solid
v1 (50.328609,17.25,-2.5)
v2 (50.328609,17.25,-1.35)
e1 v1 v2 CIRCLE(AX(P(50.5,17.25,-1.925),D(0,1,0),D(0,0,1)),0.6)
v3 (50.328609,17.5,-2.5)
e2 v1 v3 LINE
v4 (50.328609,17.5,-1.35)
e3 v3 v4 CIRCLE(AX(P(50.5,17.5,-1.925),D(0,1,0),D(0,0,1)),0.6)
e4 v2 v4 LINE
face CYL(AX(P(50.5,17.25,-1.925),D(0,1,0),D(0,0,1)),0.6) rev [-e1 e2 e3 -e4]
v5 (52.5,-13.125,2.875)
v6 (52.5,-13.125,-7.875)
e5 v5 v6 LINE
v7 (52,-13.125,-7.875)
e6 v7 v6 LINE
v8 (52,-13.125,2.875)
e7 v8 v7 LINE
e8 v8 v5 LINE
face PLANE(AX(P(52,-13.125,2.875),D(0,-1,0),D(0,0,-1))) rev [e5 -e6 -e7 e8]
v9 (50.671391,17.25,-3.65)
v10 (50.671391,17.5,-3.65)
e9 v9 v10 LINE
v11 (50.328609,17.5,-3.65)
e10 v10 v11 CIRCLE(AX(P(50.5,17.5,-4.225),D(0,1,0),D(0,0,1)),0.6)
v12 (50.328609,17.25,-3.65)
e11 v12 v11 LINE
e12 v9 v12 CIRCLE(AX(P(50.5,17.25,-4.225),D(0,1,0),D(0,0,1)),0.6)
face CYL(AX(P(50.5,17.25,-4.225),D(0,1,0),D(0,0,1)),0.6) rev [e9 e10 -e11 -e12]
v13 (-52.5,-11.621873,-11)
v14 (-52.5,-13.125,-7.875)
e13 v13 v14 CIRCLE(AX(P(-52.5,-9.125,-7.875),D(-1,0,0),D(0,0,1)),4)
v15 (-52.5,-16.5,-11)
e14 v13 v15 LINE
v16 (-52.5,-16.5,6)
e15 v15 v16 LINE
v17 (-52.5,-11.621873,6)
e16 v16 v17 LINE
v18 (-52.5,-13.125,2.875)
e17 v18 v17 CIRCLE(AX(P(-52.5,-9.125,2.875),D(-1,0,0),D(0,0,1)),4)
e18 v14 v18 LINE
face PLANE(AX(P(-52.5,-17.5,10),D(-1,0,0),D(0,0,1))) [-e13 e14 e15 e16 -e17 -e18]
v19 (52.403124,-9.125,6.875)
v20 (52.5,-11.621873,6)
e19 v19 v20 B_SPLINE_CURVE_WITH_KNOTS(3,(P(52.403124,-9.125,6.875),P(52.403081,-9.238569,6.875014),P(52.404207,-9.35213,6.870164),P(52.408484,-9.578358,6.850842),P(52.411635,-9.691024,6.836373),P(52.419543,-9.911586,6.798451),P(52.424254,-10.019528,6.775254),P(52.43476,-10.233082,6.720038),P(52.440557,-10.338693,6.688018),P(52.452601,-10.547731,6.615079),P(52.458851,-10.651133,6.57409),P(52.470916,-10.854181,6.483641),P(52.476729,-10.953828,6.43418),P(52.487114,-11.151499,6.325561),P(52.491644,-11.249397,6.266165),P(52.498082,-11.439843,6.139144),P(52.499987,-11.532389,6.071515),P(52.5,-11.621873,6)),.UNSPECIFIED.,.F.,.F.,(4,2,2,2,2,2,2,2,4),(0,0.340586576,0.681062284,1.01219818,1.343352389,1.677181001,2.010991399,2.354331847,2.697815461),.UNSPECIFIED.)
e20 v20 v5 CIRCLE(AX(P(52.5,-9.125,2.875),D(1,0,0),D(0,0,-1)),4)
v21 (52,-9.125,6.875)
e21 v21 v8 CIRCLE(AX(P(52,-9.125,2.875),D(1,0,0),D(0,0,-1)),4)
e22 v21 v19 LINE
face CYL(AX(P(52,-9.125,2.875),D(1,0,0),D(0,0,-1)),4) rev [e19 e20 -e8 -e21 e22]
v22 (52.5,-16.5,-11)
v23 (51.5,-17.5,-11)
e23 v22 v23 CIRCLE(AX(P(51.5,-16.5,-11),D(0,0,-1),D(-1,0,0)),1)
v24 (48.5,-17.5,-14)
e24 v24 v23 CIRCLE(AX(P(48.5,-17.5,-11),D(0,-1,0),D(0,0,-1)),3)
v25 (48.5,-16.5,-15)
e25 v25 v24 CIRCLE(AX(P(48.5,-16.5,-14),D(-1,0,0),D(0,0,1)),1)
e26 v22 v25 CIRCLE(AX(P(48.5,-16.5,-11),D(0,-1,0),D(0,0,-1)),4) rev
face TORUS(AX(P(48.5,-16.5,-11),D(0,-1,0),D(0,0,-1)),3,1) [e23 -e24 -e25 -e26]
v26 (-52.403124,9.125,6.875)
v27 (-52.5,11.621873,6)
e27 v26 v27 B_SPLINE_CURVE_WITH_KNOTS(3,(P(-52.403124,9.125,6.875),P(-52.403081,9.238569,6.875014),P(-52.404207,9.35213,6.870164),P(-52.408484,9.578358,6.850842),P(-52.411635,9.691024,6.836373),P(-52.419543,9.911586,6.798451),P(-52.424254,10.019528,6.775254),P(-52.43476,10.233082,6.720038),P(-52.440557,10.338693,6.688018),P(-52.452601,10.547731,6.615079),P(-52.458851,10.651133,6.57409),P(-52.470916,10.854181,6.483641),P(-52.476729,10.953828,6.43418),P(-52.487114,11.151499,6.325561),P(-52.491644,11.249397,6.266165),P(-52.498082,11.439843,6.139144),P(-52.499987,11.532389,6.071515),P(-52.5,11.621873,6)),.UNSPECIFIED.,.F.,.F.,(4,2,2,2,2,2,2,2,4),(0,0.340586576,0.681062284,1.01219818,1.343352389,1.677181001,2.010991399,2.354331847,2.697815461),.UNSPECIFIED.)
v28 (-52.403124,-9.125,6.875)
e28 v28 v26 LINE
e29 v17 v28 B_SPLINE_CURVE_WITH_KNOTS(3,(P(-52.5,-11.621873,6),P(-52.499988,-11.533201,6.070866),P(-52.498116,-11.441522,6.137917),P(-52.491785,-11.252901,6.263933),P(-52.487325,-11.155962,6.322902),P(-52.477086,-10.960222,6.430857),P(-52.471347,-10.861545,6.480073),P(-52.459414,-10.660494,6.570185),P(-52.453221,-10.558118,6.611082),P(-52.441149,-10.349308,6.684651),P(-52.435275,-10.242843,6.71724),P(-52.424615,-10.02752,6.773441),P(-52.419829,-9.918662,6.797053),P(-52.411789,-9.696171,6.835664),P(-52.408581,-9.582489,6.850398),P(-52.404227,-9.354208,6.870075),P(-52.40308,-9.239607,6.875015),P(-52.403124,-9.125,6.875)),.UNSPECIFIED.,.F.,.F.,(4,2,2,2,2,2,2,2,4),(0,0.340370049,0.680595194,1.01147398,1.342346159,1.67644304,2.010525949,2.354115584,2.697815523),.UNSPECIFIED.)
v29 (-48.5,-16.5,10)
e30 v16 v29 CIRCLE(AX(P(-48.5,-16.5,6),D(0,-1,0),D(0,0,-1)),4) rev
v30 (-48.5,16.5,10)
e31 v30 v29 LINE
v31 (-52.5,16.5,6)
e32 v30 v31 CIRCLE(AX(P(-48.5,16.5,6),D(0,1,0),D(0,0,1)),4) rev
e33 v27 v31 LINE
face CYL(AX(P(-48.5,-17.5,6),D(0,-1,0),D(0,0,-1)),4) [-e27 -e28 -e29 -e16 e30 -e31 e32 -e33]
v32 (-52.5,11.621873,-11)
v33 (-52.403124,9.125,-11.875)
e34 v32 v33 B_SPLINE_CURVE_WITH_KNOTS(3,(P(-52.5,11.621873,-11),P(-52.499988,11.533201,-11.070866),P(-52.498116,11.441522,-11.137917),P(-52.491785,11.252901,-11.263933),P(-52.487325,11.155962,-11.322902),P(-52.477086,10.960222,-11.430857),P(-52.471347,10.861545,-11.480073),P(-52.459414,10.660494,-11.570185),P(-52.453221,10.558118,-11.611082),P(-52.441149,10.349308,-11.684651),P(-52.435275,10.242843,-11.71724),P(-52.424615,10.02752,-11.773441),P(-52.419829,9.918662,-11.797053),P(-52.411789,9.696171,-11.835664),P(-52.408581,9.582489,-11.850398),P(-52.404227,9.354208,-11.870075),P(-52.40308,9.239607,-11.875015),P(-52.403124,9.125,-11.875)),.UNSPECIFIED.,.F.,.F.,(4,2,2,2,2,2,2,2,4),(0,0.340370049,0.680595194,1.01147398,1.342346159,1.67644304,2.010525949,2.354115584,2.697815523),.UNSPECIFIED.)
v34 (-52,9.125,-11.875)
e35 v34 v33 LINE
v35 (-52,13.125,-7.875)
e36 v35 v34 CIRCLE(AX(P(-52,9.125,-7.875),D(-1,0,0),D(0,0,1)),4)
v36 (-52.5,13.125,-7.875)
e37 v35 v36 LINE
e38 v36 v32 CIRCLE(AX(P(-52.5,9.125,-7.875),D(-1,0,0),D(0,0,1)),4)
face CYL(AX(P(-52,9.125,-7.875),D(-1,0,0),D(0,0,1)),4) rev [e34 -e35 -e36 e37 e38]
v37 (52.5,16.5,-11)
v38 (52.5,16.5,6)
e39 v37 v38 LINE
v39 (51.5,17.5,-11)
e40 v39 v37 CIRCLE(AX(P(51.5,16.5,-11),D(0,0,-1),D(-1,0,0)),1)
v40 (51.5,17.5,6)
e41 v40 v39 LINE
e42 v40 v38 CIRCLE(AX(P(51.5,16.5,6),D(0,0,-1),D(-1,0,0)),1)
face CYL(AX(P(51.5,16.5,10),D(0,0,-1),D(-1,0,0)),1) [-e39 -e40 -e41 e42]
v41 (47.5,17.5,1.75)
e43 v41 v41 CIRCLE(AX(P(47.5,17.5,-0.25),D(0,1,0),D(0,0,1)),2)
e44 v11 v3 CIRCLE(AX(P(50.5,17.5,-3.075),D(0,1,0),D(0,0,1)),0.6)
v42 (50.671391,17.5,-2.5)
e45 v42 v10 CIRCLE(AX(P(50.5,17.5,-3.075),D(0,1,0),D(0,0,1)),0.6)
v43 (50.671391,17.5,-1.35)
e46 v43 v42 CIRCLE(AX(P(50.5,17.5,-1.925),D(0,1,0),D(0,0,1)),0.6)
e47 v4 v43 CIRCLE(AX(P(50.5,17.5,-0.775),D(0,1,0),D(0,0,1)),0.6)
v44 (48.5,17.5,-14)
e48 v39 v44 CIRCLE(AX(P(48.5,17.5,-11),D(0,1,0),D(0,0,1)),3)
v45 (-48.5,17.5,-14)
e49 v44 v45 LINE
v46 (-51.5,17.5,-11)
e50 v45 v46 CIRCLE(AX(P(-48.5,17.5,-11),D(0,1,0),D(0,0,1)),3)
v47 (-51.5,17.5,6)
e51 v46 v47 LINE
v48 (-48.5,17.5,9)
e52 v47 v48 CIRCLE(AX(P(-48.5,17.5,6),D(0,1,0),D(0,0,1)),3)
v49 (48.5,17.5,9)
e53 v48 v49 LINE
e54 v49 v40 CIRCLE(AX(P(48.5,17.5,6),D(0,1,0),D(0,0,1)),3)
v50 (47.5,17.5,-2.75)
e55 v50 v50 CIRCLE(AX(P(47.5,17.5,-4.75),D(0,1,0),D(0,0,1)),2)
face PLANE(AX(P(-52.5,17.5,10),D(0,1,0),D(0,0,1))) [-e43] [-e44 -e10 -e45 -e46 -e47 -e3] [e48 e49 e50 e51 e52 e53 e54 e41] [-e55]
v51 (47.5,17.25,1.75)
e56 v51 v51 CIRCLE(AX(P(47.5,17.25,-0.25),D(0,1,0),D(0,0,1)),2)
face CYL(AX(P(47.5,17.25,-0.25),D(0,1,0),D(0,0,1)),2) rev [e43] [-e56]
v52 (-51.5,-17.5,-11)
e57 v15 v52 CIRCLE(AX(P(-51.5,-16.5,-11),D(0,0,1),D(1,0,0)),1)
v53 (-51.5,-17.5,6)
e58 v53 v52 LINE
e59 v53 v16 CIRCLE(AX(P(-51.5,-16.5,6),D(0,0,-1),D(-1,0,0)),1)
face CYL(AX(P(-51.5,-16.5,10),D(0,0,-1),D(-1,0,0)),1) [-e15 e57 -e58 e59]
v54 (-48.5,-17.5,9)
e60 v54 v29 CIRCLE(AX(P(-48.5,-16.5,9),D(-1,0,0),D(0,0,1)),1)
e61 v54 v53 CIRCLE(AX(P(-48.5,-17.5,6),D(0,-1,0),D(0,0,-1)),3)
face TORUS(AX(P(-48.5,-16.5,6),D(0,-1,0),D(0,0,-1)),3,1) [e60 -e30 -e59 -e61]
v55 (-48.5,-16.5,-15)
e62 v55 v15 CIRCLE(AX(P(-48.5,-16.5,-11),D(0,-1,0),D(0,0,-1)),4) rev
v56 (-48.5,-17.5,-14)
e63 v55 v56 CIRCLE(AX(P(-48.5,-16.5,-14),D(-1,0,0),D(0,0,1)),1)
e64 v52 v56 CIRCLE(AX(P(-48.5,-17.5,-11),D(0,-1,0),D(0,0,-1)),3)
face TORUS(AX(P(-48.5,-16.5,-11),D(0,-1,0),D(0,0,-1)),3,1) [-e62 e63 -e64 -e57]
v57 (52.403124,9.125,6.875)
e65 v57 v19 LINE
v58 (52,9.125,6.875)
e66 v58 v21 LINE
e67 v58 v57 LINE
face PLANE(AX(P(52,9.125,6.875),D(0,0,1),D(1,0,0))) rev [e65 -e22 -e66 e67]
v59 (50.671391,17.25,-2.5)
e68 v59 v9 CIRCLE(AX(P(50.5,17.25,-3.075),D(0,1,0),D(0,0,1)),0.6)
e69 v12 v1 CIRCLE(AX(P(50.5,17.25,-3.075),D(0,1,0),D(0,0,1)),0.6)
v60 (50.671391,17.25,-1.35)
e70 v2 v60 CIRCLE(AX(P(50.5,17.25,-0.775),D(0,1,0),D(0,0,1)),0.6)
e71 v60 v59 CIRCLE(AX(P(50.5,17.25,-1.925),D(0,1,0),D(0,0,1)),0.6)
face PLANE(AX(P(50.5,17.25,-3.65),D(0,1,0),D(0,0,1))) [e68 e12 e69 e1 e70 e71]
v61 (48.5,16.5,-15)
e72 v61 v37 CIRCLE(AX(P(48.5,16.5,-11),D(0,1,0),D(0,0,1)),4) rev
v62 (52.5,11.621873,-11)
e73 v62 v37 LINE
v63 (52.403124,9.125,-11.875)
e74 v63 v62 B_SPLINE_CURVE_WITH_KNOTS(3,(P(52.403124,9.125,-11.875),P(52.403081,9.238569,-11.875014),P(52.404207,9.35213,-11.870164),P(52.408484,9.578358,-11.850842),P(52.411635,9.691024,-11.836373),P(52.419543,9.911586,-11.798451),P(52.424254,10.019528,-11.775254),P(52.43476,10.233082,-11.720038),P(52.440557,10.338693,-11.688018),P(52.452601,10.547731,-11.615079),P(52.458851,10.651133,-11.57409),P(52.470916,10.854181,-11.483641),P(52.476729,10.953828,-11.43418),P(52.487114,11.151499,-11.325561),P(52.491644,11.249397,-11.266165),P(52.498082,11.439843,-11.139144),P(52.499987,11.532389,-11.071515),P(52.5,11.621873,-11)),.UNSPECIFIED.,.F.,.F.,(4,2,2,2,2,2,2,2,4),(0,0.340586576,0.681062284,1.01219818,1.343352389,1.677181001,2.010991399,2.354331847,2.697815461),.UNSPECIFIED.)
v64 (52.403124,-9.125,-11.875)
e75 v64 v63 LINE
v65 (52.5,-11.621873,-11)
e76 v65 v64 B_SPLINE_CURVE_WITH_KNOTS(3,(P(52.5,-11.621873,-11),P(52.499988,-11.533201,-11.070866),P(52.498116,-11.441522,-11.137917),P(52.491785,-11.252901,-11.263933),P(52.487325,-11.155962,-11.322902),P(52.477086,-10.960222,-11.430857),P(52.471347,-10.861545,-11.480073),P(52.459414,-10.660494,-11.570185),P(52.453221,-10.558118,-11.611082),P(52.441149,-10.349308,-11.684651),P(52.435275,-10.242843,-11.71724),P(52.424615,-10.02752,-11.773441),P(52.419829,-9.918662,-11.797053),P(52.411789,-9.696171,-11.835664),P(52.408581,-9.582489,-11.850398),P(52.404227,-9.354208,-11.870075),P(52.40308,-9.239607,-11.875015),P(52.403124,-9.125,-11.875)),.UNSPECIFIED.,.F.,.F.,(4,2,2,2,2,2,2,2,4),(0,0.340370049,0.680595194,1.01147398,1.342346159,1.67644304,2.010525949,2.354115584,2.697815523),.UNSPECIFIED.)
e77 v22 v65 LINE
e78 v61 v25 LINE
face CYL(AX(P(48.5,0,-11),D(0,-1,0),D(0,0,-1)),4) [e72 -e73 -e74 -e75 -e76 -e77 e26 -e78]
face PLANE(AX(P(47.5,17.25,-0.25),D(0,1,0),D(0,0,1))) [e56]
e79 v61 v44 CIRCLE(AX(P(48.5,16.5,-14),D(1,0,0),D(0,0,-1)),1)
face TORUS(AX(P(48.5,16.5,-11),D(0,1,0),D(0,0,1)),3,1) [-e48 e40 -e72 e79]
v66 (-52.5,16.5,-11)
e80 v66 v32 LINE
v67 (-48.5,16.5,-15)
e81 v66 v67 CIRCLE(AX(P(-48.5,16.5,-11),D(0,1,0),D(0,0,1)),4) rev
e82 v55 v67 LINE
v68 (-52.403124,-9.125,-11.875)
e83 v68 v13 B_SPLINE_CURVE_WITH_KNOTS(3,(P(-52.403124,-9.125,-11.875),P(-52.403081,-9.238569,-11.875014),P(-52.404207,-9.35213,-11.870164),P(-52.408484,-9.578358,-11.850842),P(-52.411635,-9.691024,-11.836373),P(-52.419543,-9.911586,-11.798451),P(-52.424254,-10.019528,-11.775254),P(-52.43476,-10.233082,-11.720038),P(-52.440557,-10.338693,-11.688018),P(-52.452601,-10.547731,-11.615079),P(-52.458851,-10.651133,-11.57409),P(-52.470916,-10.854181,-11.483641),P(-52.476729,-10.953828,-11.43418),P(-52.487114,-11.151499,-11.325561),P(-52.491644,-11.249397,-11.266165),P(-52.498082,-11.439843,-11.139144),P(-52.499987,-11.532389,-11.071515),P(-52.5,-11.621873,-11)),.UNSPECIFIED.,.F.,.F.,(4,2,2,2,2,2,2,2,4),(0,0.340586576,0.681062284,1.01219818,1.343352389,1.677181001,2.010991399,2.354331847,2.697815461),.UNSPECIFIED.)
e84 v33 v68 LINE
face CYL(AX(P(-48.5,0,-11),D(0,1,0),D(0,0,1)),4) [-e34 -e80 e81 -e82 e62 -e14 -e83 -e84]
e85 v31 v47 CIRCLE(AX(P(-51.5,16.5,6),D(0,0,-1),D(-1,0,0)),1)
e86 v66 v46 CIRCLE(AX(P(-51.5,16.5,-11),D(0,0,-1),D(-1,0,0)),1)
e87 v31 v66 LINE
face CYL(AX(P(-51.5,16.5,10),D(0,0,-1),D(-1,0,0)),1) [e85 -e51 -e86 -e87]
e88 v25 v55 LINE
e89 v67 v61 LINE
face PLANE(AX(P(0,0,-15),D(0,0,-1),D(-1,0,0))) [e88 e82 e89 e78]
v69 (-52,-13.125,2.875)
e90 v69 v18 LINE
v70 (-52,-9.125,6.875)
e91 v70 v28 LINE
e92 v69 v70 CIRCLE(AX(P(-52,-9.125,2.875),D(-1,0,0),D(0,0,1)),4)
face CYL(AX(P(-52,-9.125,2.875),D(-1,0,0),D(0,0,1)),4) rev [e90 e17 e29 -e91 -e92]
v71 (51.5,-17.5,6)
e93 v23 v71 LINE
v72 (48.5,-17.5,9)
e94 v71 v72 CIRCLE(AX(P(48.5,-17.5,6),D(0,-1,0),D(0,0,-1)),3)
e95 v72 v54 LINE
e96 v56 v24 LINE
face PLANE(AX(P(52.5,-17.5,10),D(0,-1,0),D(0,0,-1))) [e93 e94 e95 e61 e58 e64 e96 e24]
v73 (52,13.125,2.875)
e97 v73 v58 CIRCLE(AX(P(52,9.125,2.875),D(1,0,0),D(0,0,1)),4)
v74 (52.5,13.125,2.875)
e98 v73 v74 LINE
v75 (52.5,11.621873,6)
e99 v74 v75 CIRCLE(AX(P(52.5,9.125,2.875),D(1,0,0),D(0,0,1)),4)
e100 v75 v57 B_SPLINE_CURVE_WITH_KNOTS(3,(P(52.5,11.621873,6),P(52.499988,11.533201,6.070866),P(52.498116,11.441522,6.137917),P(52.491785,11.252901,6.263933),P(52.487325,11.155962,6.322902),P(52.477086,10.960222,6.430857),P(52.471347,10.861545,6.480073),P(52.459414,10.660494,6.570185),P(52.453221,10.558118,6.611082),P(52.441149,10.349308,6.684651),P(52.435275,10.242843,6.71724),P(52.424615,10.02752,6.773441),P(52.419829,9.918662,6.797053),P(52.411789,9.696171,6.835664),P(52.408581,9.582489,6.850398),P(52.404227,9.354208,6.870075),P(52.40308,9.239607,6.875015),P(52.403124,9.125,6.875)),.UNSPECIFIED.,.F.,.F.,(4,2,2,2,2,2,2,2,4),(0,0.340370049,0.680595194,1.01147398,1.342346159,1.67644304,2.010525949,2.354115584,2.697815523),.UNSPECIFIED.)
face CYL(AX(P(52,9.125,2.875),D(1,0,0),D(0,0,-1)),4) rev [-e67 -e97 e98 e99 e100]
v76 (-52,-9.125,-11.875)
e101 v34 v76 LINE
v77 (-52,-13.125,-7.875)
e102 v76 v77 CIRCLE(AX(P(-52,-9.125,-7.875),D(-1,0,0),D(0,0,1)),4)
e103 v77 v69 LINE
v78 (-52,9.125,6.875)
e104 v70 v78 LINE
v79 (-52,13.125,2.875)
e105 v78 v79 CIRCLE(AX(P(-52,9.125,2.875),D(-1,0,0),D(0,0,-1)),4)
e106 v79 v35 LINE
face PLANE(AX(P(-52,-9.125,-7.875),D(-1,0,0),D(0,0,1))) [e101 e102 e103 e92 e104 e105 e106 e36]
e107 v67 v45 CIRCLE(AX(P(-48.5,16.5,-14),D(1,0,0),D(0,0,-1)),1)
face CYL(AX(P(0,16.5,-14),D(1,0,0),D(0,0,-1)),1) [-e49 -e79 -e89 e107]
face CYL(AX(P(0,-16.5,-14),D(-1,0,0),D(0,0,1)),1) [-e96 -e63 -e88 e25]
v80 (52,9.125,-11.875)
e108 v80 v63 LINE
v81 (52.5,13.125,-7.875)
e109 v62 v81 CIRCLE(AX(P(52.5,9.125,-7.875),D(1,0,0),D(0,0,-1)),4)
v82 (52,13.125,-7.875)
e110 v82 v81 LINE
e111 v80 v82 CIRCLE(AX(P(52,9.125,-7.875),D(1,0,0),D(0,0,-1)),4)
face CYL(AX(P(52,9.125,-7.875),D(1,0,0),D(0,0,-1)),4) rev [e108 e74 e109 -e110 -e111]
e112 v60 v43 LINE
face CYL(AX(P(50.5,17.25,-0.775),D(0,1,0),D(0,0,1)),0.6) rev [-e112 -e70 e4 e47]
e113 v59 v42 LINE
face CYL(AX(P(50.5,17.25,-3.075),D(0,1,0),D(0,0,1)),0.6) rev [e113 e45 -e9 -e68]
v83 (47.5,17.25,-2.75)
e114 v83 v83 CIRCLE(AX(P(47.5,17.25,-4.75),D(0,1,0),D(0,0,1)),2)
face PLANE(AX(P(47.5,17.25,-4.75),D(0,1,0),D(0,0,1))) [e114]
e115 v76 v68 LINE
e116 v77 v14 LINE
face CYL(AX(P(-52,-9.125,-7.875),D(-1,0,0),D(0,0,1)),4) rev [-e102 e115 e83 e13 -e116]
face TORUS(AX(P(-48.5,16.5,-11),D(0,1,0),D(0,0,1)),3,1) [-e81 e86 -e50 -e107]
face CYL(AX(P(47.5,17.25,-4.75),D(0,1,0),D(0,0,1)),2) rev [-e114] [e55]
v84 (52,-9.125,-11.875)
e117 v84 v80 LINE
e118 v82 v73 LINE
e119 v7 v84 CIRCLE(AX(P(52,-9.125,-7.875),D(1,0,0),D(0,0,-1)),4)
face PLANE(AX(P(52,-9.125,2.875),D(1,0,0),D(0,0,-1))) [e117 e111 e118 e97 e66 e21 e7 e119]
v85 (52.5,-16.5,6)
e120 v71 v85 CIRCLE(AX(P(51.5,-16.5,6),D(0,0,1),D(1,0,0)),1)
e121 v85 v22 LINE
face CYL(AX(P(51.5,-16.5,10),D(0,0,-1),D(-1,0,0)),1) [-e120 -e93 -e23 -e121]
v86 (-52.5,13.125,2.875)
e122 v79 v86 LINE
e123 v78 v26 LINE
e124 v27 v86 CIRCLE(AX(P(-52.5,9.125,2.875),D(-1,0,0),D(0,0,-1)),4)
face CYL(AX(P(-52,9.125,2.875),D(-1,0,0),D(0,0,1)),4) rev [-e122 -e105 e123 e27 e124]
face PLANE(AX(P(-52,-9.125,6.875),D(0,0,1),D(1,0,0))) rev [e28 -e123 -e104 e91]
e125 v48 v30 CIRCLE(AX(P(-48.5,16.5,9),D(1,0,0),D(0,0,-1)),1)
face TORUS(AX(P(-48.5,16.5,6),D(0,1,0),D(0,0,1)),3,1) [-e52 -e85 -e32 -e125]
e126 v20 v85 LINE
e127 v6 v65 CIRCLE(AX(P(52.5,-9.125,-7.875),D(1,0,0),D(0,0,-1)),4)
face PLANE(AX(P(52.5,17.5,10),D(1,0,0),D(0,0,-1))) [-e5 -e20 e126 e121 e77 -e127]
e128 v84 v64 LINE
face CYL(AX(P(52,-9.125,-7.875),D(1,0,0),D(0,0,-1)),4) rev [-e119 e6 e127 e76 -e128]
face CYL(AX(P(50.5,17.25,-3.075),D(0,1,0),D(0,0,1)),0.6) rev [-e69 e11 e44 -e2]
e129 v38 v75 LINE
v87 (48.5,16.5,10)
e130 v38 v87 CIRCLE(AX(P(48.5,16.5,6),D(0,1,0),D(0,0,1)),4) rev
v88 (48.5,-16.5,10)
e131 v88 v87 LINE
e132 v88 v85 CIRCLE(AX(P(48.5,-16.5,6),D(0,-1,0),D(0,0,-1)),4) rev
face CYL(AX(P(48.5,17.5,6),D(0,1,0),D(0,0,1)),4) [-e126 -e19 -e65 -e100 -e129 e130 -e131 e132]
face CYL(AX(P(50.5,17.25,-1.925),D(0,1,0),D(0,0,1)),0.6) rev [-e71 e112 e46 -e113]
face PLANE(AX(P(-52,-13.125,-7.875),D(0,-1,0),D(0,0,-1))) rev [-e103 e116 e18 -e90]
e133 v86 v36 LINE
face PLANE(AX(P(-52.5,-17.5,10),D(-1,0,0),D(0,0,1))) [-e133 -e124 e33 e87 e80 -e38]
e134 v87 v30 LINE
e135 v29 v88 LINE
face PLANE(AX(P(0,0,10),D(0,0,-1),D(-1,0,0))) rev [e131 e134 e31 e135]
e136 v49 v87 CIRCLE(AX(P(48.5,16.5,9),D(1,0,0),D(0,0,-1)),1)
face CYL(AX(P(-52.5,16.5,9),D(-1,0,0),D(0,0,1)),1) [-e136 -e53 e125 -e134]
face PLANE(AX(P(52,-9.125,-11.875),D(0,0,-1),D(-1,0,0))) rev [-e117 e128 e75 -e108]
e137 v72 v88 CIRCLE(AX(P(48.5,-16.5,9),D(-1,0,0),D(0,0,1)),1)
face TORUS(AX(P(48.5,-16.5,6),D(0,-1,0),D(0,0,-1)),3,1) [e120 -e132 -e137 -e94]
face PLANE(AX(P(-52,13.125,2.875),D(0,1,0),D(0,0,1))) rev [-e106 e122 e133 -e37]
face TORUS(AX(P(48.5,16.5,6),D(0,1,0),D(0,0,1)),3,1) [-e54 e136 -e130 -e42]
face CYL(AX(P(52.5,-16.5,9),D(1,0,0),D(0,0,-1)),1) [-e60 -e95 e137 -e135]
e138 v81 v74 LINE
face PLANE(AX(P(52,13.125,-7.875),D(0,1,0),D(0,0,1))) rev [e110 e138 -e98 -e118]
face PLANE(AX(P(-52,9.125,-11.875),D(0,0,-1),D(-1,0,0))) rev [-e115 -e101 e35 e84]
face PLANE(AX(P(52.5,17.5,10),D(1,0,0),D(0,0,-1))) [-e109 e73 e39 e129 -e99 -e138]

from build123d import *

# Parameters (mm, degrees)
SKETCH1_W           = 105
SKETCH1_H           = 35
BOSS_EXTRUDE1_DEPTH = 25
CUT_EXTRUDE1_DEPTH  = 0.5
CUT_EXTRUDE2_START  = -0.5
CUT_EXTRUDE2_DEPTH  = 0.5
FILLET1_R           = 4
FILLET2_R           = 1
SKETCH5_R           = 2
CUT_EXTRUDE3_DEPTH  = 0.25
CUT_EXTRUDE4_DEPTH  = 0.25


with BuildPart() as part:
    # Sketch1 → Boss-Extrude1 (new body)
    with BuildSketch(Plane(origin=(0, 0, -15), x_dir=(-1, 0, 0), z_dir=(0, 0, -1))):
        Rectangle(SKETCH1_W, SKETCH1_H)
    extrude(amount=-BOSS_EXTRUDE1_DEPTH)

    # Sketch2 → Cut-Extrude1 (cut)
    with BuildSketch(Plane(origin=(52.5, 0, 0), x_dir=(0, 0, -1), z_dir=(1, 0, 0))):
        with BuildLine():
            Line((-6.875, 9.125), (-6.875, -9.125))
            ThreePointArc((-6.875, -9.125), (-5.703427125, -11.953427125), (-2.875, -13.125))
            Line((-2.875, -13.125), (7.875, -13.125))
            ThreePointArc((7.875, -13.125), (10.703427125, -11.953427125), (11.875, -9.125))
            Line((11.875, -9.125), (11.875, 9.125))
            ThreePointArc((11.875, 9.125), (10.703427125, 11.953427125), (7.875, 13.125))
            Line((7.875, 13.125), (-2.875, 13.125))
            ThreePointArc((-2.875, 13.125), (-5.703427125, 11.953427125), (-6.875, 9.125))
        make_face()
    extrude(amount=-CUT_EXTRUDE1_DEPTH, mode=Mode.SUBTRACT)

    # Sketch3 → Cut-Extrude2 (cut)
    with BuildSketch(Plane.ZY.offset(52.5).offset(CUT_EXTRUDE2_START)):
        with BuildLine():
            Line((2.875, 13.125), (-7.875, 13.125))
            ThreePointArc((-7.875, 13.125), (-10.703427125, 11.953427125), (-11.875, 9.125))
            Line((-11.875, 9.125), (-11.875, -9.125))
            ThreePointArc((-11.875, -9.125), (-10.703427125, -11.953427125), (-7.875, -13.125))
            Line((-7.875, -13.125), (2.875, -13.125))
            ThreePointArc((2.875, -13.125), (5.703427125, -11.953427125), (6.875, -9.125))
            Line((6.875, -9.125), (6.875, 9.125))
            ThreePointArc((6.875, 9.125), (5.703427125, 11.953427125), (2.875, 13.125))
        make_face()
    extrude(amount=CUT_EXTRUDE2_DEPTH, mode=Mode.SUBTRACT)

    # Fillet1
    # the kernel refuses this fillet: 4 mm, written as the material it takes off along each edge
    with BuildSketch(Plane(origin=(-52.5, -27.5, -15), x_dir=(0, 0, 1), z_dir=(0, 1, 0)), Plane(origin=(52.5, 27.5, -15), x_dir=(0, 0, 1), z_dir=(0, -1, 0))) as fillet1_piece_1:
        with BuildLine():
            CenterArc((FILLET1_R, FILLET1_R), FILLET1_R, 180, 90)
            Line((0, FILLET1_R), (0, 0))
            Line((0, 0), (FILLET1_R, 0))
        make_face()
    extrude(amount=55, mode=Mode.SUBTRACT)
    with BuildSketch(Plane(origin=(-52.5, -27.5, 10), x_dir=(0, 0, -1), z_dir=(0, 1, 0)), Plane(origin=(52.5, 27.5, 10), x_dir=(0, 0, -1), z_dir=(0, -1, 0))) as fillet1_piece_2:
        with BuildLine():
            CenterArc((FILLET1_R, -FILLET1_R), FILLET1_R, 90, 90)
            Line((0, -FILLET1_R), (0, 0))
            Line((0, 0), (FILLET1_R, 0))
        make_face()
    extrude(amount=55, mode=Mode.SUBTRACT)

    # Fillet2
    fillet2_edges = [part.edges().sort_by_distance(p)[0] for p in [
        (0, -17.5, -15),
        (0, 17.5, -15),
        (-52.5, 17.5, -2.5),
        (0, 17.5, 10),
        (52.5, 17.5, -2.5),
        (51.328427125, 17.5, 8.828427125),
        (51.328427125, 17.5, -13.828427125),
        (-51.328427125, 17.5, 8.828427125),
        (-51.328427125, 17.5, -13.828427125),
        (-52.5, -17.5, -2.5),
        (52.5, -17.5, -2.5),
        (0, -17.5, 10),
        (51.328427125, -17.5, 8.828427125),
        (51.328427125, -17.5, -13.828427125),
        (-51.328427125, -17.5, 8.828427125),
        (-51.328427125, -17.5, -13.828427125),
    ]]
    fillet(fillet2_edges, radius=FILLET2_R)

    # Sketch5 → Cut-Extrude3 (cut)
    with BuildSketch(Plane(origin=(0, 17.5, 0), x_dir=(1, 0, 0), z_dir=(0, 1, 0))):
        with Locations(Location((47.5, 0.25, 0), (0, 0, 270))):
            Circle(SKETCH5_R)
        with Locations(Location((47.5, 4.75, 0), (0, 0, 270))):
            Circle(SKETCH5_R)
    extrude(amount=-CUT_EXTRUDE3_DEPTH, mode=Mode.SUBTRACT)

    # Sketch6 → Cut-Extrude4 (cut)
    with BuildSketch(Plane(origin=(0, 17.5, 0), x_dir=(1, 0, 0), z_dir=(0, 1, 0))):
        with BuildLine():
            ThreePointArc((50.671391365, 3.65), (50.5, 4.825), (50.328608635, 3.65))
            ThreePointArc((50.328608635, 3.65), (49.9, 3.075), (50.328608635, 2.5))
            ThreePointArc((50.328608635, 2.5), (49.9, 1.925), (50.328608635, 1.35))
            ThreePointArc((50.328608635, 1.35), (50.5, 0.175), (50.671391365, 1.35))
            ThreePointArc((50.671391365, 1.35), (51.1, 1.925), (50.671391365, 2.5))
            ThreePointArc((50.671391365, 2.5), (51.1, 3.075), (50.671391365, 3.65))
        make_face()
    extrude(amount=-CUT_EXTRUDE4_DEPTH, mode=Mode.SUBTRACT)


solid = part.part
